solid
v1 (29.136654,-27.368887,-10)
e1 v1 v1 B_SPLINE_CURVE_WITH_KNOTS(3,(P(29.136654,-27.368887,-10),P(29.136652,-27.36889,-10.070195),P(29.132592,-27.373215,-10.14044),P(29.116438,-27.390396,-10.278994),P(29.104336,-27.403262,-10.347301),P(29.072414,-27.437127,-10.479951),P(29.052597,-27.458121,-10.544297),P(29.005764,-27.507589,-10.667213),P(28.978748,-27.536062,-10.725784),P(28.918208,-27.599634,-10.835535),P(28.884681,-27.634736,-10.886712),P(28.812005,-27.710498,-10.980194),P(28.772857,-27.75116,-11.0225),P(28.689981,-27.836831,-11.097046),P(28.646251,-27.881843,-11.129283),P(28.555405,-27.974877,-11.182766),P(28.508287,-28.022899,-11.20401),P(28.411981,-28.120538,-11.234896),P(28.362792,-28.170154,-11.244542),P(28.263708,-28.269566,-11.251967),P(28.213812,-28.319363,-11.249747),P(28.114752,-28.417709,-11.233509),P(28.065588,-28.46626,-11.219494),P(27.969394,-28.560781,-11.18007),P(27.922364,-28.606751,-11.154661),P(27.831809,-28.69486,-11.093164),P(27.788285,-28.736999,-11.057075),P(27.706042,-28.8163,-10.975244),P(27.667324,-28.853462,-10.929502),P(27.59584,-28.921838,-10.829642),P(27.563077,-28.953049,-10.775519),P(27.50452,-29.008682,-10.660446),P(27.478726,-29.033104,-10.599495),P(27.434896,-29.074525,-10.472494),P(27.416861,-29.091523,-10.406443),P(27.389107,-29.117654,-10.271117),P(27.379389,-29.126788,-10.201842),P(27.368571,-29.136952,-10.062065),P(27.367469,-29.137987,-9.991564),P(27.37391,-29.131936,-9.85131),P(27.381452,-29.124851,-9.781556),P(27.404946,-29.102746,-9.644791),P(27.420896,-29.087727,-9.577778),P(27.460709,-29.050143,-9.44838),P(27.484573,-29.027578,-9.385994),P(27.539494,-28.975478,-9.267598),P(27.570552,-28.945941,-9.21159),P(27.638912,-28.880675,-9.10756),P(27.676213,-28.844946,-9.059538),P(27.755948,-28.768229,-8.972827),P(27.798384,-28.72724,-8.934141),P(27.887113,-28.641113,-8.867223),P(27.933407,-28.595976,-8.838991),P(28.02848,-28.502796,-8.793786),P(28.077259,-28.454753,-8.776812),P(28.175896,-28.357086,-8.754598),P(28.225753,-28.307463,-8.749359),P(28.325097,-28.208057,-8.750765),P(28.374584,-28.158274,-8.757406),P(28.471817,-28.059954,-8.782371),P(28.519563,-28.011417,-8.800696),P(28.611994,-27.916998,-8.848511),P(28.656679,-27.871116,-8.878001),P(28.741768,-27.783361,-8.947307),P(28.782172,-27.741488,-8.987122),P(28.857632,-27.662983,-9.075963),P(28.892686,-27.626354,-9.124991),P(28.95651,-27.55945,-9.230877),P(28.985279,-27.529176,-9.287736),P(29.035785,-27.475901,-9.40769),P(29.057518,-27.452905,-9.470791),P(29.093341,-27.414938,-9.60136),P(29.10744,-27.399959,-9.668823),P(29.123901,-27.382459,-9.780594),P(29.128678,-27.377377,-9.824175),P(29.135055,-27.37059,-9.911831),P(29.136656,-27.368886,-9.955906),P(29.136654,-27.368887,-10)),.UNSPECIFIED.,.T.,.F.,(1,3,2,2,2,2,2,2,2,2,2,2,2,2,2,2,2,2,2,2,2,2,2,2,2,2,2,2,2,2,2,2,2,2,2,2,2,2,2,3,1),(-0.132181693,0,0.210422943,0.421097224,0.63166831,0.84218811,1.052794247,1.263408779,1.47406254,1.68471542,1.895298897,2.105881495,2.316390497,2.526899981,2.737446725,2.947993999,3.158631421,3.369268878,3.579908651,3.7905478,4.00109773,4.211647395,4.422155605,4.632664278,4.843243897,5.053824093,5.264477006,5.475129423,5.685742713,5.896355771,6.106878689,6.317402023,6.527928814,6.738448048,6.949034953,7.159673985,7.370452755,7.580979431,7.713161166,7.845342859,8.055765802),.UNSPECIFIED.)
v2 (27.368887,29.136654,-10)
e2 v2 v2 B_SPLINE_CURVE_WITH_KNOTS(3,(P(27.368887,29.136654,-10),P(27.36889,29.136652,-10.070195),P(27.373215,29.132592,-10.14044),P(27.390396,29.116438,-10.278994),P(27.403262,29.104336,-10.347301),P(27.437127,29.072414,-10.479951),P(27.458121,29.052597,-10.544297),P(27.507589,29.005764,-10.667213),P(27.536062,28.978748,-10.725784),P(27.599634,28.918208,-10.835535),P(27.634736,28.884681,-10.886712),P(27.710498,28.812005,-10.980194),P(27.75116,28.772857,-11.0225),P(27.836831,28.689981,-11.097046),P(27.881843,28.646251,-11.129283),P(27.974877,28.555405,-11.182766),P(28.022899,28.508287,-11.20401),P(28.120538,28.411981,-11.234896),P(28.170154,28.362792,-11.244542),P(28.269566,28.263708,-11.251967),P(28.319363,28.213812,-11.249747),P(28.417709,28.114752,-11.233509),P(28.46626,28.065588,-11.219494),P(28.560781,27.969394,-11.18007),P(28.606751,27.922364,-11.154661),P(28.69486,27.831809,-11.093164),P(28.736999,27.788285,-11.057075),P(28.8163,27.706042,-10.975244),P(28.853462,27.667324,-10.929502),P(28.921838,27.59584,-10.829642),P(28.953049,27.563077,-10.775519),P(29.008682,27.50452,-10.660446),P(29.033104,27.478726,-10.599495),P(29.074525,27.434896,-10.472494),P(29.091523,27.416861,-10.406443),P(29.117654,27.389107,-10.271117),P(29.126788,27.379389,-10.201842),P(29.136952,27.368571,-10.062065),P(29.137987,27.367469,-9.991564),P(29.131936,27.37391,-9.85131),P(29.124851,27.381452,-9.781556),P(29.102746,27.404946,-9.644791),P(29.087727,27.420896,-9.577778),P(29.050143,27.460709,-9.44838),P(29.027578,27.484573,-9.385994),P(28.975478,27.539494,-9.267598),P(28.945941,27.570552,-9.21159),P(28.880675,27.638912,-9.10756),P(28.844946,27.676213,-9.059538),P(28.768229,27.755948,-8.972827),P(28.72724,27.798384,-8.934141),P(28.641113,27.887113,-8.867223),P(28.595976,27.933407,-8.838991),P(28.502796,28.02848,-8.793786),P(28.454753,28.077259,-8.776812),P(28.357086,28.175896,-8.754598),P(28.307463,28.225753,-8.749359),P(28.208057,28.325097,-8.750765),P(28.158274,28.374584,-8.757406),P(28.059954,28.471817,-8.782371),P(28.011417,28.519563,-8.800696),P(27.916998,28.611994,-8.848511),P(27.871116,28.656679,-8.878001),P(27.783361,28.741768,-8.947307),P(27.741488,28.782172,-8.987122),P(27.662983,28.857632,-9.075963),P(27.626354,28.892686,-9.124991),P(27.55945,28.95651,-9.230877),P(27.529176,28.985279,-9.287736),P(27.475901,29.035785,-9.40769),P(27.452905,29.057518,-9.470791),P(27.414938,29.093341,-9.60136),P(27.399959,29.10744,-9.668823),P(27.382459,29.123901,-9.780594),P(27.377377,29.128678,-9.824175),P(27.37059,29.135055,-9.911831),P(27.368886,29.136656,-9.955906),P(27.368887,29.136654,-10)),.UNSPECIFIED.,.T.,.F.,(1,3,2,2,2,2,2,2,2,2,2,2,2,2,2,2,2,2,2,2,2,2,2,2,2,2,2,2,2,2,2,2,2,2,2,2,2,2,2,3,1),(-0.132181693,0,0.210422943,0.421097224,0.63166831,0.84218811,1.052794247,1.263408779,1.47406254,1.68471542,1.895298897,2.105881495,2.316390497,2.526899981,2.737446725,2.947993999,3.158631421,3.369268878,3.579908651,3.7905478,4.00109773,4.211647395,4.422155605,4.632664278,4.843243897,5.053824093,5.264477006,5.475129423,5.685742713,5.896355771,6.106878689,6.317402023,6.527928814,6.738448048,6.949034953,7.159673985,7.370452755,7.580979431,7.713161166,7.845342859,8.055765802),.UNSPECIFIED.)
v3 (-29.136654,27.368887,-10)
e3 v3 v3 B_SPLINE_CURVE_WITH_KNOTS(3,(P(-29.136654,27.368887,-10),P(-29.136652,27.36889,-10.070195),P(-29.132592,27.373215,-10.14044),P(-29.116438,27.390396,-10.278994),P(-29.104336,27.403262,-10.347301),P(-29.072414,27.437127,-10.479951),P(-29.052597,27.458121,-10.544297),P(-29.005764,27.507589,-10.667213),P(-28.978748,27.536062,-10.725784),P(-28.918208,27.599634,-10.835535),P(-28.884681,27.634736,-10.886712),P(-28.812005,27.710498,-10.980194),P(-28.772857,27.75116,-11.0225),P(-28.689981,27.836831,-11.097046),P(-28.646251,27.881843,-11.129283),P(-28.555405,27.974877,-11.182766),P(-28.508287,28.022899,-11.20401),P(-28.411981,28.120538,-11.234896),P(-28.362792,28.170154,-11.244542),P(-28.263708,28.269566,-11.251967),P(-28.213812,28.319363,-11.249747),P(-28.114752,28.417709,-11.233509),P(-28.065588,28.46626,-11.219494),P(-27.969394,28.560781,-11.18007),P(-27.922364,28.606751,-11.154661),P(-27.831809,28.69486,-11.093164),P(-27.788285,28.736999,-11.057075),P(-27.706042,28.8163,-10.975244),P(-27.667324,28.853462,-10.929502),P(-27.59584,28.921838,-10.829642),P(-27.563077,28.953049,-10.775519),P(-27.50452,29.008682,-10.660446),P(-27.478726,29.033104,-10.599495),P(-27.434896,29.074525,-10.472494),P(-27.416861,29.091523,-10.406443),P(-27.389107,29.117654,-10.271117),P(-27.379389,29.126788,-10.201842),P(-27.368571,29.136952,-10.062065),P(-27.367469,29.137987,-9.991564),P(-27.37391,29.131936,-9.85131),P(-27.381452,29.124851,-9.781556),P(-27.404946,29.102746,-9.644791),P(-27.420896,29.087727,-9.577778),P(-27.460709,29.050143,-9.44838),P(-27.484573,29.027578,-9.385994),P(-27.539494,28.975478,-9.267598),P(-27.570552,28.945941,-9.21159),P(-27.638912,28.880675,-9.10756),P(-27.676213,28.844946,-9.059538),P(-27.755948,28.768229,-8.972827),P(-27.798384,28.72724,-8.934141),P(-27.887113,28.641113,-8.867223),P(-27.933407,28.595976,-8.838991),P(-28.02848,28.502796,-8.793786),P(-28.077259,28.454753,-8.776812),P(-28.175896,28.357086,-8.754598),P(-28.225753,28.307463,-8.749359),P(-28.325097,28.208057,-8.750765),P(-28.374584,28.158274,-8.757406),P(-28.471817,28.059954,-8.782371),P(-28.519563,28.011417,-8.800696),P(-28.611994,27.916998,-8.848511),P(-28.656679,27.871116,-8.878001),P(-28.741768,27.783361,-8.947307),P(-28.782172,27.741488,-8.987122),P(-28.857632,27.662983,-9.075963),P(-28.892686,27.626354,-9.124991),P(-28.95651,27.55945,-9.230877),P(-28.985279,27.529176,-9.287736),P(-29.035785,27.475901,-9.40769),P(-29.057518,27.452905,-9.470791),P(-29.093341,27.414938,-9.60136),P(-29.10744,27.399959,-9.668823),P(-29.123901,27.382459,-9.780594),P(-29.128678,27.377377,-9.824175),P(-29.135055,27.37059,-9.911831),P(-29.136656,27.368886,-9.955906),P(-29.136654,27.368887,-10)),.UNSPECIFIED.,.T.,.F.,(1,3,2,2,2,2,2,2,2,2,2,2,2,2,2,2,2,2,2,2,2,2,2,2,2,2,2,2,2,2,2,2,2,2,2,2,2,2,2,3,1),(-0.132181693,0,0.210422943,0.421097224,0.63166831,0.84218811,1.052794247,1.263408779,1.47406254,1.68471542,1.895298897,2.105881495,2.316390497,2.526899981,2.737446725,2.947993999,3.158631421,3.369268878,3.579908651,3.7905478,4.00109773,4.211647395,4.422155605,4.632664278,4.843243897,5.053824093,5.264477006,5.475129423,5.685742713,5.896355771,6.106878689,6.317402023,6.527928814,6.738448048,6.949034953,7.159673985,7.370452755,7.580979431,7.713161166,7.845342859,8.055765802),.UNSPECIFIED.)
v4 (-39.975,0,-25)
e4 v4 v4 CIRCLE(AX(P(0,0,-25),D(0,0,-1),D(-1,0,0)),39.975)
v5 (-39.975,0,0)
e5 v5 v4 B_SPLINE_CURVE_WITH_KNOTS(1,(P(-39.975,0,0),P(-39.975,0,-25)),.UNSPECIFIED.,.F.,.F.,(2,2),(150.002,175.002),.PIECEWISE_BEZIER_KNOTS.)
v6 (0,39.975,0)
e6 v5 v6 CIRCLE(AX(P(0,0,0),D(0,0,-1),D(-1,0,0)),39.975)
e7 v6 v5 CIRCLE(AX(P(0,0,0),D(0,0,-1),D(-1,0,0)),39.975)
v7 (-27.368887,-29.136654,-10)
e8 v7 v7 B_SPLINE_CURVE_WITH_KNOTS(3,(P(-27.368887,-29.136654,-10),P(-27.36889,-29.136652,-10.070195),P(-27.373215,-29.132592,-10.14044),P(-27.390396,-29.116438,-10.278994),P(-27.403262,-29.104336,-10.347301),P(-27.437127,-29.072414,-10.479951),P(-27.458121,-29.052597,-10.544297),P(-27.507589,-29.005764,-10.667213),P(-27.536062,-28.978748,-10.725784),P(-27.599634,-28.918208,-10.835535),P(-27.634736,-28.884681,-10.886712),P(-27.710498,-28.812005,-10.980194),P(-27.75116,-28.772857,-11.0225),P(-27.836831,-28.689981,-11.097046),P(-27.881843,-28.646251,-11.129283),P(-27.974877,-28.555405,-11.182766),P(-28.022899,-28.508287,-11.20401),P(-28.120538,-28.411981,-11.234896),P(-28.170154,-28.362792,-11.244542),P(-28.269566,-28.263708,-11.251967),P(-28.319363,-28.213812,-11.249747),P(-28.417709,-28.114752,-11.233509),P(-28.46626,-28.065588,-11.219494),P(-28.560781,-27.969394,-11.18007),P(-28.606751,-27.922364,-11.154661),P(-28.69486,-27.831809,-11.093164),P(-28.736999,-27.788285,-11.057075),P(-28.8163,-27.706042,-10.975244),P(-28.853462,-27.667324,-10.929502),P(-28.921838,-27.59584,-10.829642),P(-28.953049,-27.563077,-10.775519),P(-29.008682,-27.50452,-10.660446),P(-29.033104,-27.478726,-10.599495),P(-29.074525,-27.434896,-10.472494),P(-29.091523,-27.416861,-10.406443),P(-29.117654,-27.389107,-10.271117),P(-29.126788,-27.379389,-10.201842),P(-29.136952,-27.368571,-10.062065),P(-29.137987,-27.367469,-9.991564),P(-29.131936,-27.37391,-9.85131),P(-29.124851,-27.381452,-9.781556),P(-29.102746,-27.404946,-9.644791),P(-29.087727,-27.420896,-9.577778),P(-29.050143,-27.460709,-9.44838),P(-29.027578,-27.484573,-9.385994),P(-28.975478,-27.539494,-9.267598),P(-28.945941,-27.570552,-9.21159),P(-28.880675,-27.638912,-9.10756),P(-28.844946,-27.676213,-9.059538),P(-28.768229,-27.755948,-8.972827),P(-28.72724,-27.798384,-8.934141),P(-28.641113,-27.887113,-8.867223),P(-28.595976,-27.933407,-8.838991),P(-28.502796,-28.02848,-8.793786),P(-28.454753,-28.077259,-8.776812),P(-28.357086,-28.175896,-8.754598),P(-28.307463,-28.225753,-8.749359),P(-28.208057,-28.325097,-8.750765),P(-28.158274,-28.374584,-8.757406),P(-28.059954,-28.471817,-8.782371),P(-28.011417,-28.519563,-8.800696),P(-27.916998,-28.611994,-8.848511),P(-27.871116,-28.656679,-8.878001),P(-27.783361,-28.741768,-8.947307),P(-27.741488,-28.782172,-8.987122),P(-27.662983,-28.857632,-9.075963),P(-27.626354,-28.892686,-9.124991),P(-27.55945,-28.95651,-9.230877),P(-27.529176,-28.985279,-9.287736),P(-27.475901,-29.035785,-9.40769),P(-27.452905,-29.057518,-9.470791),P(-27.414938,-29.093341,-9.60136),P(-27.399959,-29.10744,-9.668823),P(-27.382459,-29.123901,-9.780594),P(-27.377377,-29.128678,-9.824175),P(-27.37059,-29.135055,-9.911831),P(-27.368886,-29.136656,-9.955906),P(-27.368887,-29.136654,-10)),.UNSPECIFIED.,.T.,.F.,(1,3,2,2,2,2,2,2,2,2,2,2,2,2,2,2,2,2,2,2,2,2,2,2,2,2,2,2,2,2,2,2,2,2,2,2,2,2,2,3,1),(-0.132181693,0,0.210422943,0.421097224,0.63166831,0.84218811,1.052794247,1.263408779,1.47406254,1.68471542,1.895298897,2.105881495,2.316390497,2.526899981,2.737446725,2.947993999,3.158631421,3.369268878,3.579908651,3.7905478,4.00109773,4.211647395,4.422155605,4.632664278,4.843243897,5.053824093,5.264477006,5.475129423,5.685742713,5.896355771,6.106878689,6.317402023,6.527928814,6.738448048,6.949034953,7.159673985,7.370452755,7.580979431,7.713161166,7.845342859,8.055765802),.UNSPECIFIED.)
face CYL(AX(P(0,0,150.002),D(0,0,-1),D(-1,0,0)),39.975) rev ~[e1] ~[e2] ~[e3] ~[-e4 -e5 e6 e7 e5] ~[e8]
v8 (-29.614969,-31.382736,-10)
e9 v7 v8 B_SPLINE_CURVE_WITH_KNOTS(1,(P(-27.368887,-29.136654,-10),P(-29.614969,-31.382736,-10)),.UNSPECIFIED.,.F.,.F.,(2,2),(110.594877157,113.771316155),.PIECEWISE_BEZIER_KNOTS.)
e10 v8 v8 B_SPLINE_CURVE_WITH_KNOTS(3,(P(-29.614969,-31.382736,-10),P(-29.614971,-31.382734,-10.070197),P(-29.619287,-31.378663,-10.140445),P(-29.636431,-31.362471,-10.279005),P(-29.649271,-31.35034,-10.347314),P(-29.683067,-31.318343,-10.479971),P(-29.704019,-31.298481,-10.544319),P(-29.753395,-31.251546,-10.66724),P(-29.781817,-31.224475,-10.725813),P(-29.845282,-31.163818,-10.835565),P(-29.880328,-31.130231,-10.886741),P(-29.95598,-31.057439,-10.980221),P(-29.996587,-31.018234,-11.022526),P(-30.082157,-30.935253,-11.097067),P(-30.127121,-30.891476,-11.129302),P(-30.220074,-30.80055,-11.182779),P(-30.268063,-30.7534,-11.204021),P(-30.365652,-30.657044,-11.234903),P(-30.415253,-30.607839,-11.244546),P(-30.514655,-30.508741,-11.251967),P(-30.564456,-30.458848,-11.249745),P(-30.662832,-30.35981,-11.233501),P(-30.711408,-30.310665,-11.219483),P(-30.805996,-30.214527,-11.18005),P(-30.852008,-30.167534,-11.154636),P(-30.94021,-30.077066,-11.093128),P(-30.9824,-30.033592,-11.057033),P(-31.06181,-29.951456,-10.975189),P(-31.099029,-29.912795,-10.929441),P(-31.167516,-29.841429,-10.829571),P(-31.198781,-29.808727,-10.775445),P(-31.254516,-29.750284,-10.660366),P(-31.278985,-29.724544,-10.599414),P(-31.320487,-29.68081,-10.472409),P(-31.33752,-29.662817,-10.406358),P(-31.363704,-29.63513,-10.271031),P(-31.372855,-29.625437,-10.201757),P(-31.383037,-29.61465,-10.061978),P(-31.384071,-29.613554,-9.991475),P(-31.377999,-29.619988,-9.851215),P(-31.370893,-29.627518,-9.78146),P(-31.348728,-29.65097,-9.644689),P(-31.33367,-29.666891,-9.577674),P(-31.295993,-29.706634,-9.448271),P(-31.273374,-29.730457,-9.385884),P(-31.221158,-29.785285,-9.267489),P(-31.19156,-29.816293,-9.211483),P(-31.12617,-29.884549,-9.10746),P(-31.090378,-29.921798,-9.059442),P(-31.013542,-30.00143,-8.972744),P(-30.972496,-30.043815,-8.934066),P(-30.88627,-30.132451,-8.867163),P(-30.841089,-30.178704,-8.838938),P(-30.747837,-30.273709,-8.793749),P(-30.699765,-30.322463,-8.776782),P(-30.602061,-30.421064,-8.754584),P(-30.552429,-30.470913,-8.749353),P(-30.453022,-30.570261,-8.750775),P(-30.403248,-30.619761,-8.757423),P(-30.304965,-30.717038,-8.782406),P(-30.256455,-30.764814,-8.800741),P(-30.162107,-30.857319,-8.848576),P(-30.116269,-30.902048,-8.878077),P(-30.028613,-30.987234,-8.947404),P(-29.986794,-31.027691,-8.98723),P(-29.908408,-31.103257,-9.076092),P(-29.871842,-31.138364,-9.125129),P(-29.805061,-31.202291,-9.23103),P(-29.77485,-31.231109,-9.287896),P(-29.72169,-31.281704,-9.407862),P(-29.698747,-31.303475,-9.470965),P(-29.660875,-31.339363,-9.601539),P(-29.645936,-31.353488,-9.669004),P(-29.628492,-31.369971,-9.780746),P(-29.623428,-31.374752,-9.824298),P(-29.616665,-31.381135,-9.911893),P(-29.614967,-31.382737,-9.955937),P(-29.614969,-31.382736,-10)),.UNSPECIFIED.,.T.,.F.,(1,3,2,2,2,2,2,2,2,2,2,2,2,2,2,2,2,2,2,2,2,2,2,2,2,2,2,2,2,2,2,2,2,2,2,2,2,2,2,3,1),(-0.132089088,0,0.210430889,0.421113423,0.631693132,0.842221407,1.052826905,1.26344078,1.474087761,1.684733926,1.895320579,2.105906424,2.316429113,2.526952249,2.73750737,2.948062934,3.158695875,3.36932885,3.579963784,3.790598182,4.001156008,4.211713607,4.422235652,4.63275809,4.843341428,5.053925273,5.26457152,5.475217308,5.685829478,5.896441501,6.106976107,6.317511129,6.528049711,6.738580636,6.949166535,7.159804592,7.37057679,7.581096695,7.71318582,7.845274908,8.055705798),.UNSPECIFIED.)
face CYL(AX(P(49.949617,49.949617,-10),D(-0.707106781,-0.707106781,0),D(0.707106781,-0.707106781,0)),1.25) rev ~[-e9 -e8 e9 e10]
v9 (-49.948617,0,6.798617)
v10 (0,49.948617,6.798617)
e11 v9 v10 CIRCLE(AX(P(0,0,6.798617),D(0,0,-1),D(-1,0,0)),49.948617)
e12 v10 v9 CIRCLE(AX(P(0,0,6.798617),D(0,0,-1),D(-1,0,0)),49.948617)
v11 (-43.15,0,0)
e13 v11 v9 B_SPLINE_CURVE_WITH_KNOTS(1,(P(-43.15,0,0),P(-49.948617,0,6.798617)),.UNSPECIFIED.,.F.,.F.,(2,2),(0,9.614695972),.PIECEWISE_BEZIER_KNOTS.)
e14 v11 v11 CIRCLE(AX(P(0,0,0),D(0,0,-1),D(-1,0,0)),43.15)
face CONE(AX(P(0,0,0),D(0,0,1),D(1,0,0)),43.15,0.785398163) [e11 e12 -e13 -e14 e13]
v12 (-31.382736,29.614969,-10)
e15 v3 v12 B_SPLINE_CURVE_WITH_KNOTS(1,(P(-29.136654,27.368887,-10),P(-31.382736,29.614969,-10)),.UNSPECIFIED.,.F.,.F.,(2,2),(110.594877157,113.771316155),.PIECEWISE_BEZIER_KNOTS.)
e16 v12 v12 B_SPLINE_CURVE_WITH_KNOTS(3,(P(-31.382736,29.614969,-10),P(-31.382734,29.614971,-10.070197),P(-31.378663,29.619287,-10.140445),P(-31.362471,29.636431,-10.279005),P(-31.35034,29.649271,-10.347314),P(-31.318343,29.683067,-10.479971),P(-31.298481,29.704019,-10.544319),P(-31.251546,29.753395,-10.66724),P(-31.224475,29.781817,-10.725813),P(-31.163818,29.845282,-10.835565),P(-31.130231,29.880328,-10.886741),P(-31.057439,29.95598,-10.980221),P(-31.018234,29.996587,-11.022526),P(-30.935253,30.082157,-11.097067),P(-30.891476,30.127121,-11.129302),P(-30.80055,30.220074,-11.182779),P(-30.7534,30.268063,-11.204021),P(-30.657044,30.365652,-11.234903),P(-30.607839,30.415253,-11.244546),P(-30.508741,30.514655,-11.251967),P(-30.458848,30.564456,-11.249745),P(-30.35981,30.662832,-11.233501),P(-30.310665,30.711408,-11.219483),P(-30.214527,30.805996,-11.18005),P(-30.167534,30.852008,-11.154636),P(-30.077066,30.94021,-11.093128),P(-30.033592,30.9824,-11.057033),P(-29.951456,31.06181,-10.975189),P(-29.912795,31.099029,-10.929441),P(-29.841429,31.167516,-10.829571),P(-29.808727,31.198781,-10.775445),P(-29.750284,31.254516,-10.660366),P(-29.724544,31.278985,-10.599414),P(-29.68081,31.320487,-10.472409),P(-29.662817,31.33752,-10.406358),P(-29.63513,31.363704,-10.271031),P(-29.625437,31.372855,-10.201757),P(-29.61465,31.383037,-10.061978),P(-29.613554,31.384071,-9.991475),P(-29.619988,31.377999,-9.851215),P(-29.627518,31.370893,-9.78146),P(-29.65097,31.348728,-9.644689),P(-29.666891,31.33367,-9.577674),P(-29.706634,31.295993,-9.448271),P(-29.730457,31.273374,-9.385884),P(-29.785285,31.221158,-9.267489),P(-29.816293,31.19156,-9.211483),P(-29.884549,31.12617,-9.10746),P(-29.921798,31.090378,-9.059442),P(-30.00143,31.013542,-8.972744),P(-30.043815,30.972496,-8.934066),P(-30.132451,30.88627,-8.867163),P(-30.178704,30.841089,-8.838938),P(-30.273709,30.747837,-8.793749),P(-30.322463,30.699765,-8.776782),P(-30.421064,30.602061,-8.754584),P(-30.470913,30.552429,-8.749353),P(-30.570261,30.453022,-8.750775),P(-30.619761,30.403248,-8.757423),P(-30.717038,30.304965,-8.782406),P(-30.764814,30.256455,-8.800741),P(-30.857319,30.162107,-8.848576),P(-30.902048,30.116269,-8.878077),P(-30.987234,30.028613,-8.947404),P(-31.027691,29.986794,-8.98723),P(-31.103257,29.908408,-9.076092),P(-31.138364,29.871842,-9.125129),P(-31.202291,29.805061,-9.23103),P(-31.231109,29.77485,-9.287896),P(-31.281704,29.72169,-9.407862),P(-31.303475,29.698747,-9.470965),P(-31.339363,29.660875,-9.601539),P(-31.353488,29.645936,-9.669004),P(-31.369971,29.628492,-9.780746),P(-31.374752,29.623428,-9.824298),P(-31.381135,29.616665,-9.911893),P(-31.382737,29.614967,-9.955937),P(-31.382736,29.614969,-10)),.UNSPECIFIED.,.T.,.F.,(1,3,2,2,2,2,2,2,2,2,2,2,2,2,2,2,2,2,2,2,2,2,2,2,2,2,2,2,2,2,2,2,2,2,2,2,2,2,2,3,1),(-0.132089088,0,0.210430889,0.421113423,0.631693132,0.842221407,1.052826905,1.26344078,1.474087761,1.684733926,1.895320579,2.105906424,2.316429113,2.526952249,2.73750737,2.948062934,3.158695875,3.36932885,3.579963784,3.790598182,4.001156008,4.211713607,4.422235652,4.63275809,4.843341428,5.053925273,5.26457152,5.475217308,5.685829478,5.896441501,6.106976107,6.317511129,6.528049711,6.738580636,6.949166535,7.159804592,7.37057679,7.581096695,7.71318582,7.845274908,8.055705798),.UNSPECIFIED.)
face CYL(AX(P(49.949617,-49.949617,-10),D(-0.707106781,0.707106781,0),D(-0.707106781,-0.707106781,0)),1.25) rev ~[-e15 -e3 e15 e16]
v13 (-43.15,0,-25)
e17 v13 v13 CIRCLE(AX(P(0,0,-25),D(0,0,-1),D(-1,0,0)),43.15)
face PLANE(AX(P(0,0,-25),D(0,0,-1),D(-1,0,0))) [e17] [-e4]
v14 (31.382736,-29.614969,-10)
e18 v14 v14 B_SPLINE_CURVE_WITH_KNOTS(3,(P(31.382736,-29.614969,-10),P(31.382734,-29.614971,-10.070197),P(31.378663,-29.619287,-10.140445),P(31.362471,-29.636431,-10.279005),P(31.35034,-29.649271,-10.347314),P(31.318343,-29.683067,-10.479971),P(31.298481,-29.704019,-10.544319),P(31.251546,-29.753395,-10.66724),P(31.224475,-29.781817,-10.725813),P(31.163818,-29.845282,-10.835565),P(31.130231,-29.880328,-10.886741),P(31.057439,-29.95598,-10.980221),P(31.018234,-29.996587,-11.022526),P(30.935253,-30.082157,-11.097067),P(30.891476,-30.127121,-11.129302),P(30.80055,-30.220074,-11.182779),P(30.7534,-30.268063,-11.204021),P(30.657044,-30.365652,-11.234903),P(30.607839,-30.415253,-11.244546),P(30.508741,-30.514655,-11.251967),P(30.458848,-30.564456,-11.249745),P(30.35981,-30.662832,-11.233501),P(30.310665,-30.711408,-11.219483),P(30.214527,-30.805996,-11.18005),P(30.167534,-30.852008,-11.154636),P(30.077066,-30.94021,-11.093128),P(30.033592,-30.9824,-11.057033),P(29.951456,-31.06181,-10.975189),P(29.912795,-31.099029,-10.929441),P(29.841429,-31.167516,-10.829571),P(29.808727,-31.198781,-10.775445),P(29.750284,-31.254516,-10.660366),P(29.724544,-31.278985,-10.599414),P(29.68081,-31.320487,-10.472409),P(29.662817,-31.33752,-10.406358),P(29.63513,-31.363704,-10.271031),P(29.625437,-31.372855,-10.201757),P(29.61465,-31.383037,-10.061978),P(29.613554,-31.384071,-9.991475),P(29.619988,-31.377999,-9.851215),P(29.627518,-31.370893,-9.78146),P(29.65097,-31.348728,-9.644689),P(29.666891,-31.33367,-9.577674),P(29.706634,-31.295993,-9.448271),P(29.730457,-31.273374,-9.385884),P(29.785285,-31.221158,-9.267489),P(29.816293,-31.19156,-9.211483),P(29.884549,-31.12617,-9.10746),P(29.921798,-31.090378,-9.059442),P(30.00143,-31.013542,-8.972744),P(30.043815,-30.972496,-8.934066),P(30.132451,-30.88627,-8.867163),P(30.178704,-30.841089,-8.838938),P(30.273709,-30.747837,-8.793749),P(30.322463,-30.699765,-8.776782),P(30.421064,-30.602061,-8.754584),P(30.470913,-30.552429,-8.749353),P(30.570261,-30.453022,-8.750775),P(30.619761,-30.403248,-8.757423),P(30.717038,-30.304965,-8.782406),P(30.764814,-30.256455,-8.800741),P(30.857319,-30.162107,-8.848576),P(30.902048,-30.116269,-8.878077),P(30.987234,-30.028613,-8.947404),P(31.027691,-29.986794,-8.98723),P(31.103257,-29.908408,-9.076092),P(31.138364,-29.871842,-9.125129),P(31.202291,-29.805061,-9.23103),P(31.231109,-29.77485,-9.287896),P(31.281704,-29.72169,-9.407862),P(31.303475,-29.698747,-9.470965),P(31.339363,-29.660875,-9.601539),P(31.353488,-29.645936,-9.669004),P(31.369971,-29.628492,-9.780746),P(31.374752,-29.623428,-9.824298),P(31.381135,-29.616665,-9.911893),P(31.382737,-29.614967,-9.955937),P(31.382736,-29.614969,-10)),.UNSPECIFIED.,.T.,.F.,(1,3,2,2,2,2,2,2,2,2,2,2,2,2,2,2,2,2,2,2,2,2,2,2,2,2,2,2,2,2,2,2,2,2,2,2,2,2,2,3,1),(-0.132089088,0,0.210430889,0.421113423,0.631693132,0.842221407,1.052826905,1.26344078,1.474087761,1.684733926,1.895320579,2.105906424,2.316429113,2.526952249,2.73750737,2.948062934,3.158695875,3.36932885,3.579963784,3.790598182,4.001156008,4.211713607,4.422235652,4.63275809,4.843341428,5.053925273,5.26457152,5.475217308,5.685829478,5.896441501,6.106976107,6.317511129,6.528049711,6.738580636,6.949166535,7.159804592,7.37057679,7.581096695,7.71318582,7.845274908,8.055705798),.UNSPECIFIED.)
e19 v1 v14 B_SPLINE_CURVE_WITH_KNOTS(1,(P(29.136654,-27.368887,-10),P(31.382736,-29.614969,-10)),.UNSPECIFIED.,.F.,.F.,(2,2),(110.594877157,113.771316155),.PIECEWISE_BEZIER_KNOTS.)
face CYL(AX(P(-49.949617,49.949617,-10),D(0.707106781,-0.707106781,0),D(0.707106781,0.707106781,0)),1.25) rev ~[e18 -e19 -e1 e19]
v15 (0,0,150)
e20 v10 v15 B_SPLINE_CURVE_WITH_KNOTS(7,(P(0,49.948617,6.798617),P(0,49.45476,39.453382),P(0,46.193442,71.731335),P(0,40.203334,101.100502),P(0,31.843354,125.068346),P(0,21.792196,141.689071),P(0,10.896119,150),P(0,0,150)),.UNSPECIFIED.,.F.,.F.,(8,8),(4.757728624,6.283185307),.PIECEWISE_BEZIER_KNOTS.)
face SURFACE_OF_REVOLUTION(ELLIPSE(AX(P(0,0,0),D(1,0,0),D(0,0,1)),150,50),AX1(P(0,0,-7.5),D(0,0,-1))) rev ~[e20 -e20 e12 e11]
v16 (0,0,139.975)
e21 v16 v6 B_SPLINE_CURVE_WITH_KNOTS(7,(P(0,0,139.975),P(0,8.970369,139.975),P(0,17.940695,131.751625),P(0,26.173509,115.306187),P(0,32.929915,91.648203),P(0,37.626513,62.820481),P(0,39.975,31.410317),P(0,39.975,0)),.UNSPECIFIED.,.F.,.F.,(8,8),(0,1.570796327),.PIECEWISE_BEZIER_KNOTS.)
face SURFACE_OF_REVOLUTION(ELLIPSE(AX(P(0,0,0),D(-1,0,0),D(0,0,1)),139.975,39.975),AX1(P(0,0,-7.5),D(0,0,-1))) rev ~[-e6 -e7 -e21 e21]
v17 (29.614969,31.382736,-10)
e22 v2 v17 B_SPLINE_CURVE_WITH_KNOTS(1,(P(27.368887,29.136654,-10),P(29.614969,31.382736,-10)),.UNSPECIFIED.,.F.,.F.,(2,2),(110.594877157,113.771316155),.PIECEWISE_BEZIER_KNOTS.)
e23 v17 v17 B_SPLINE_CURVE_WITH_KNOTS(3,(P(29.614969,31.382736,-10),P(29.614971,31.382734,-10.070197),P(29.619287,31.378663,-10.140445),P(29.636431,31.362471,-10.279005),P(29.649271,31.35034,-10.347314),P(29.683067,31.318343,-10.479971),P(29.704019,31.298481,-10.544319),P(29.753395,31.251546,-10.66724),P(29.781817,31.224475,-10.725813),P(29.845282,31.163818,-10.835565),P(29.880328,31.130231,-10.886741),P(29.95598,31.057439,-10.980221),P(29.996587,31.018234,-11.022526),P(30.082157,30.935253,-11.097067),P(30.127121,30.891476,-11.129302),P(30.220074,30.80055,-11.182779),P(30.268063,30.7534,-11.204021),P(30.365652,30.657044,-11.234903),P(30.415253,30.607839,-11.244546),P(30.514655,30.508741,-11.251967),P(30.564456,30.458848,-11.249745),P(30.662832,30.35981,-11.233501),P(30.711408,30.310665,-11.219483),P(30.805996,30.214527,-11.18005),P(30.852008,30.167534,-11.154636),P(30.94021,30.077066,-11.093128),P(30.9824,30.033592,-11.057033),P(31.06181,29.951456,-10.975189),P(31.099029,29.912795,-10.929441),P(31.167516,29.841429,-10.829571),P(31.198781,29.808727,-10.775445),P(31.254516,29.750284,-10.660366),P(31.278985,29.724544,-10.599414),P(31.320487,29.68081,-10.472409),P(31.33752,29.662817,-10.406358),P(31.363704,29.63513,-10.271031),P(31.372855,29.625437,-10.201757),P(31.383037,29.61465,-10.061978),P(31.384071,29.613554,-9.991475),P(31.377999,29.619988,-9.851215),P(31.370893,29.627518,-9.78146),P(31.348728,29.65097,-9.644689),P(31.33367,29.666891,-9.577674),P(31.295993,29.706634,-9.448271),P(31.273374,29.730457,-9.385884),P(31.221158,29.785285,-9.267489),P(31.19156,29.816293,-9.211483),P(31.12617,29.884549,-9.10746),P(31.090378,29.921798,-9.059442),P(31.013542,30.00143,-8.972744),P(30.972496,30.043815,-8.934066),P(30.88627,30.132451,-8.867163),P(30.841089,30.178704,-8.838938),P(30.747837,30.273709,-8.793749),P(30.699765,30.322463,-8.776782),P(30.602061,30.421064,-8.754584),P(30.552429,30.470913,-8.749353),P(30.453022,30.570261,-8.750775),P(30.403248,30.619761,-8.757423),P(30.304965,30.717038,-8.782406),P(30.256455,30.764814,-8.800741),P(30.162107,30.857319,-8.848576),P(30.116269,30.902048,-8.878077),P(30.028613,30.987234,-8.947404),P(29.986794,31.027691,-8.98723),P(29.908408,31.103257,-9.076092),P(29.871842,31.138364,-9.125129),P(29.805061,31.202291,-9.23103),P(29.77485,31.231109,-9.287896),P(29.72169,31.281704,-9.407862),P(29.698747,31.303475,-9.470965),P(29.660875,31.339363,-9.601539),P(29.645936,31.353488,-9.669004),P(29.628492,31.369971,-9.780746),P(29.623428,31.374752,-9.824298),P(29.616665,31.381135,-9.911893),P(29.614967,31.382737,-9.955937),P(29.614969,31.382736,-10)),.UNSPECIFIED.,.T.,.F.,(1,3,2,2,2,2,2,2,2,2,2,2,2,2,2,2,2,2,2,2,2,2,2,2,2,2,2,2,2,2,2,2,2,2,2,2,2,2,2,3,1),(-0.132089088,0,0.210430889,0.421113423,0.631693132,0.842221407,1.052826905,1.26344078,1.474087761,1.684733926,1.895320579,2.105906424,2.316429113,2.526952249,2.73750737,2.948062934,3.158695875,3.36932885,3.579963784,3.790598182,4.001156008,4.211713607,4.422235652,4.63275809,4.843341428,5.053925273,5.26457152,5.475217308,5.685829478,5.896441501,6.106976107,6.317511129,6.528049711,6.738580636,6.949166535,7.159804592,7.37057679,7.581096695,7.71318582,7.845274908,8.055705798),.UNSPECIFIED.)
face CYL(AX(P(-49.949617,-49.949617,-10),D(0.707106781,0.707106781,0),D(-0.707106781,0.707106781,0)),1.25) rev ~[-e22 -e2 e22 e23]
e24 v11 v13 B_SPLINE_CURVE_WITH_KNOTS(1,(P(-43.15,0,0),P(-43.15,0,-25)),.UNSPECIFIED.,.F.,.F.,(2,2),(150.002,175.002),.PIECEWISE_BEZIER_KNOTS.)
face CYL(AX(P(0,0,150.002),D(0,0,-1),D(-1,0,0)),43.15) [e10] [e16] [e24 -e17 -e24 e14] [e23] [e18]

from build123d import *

# Parameters (mm, degrees)
UPPER_AIRFRAME_COUPLER_SKETCH_R      = 43.15
UPPER_AIRFRAME_COUPLER_SKETCH_R_2    = 39.975
UPPER_AIRFRAME_COUPLER_EXTRUDE_DEPTH = 25
SHEAR_PIN_BORE_CUT_REACH             = 190.276
SHEAR_PIN_BORE_CUT_END_RADIUS        = 39.975
SHEAR_PIN_BORE_SKETCH_R              = 1.25
SHEAR_PIN_PATTERN_COUNT              = 4


with BuildPart() as part:
    # Ellipsoid Sketch → Ellipsoid Revolve (revolve)
    with BuildSketch(Plane(origin=(0, 0, 0), x_dir=(0, 0, -1), z_dir=(1, 0, 0))):
        with BuildLine():
            Line((-150, 0), (-139.975, 0))
            add(Edge.make_bspline(
                [(0, 39.975), (-139.975, 39.975), (-139.975, 0)],
                knots=[4.71238898, 4.71238898, 4.71238898, 6.283185307, 6.283185307, 6.283185307], degree=2, weights=[1, 0.707106781, 1]))
            Line((0, 39.975), (0, 50))
            add(Edge.make_bspline(
                [(0, 50), (-150, 50), (-150, 0)],
                knots=[4.71238898, 4.71238898, 4.71238898, 6.283185307, 6.283185307, 6.283185307], degree=2, weights=[1, 0.707106781, 1]))
        make_face()
    revolve(axis=Axis((0, 0, -7.5), (0, 0, 1)))

    # Upper Airframe Coupler Sketch → Upper Airframe Coupler Extrude (add)
    with BuildSketch(Plane(origin=(0, 0, 0), x_dir=(-1, 0, 0), z_dir=(0, 0, -1))):
        Circle(UPPER_AIRFRAME_COUPLER_SKETCH_R)
        Circle(UPPER_AIRFRAME_COUPLER_SKETCH_R_2, mode=Mode.SUBTRACT)
    extrude(amount=UPPER_AIRFRAME_COUPLER_EXTRUDE_DEPTH)

    # Upper Airframe Mate Chamfer: read off the stored shape, not the designer's step
    # Upper Airframe Mate Chamfer outline → Upper Airframe Mate Chamfer (revolve, cut)
    with BuildSketch(Plane.XZ):
        Polygon((49.948616721, 6.798616721), (43.15, 0), (50, 0), (50, 6.798616721), align=None)
    revolve(axis=Axis((0, 0, 0), (0, 0, 1)), mode=Mode.SUBTRACT)

    # Shear Pin Bore Cut: up to this cylinder (the profile starts outside it)
    shear_pin_bore_cut_end = Plane(origin=(0, 0, -10), z_dir=(0, 0, -1)) * Cylinder(SHEAR_PIN_BORE_CUT_END_RADIUS, 461.502, mode=Mode.PRIVATE)
    # Shear Pin Bore Sketch → Shear Pin Bore Cut (cut, up to the surface)
    with BuildSketch(Plane(origin=(30.511657608, -30.511657608, 0), x_dir=(-0.7071067811865475, -0.7071067811865477, 0), z_dir=(0.7071067811865477, -0.7071067811865475, 0)), mode=Mode.PRIVATE) as shear_pin_bore_cut_sk1:
        with Locations(Location((0, 10, 0), (0, 0, 180))):
            Circle(SHEAR_PIN_BORE_SKETCH_R)
    shear_pin_bore_cut_tool1 = extrude(shear_pin_bore_cut_sk1.sketch, amount=-SHEAR_PIN_BORE_CUT_REACH, mode=Mode.PRIVATE) - shear_pin_bore_cut_end
    shear_pin_bore_cut = shear_pin_bore_cut_tool1.solids().sort_by_distance((30.511658, -30.511658, -10))[0]
    add(shear_pin_bore_cut, mode=Mode.SUBTRACT)

    # Shear Pin Pattern: Shear Pin Bore Cut ×4 about axis
    shear_pin_pattern_axis = Axis((0, 0, 0), (0, 0, 1))
    for i in range(1, SHEAR_PIN_PATTERN_COUNT):
        add(shear_pin_bore_cut.rotate(shear_pin_pattern_axis, i * 360 / SHEAR_PIN_PATTERN_COUNT), mode=Mode.SUBTRACT)


solid = part.part
